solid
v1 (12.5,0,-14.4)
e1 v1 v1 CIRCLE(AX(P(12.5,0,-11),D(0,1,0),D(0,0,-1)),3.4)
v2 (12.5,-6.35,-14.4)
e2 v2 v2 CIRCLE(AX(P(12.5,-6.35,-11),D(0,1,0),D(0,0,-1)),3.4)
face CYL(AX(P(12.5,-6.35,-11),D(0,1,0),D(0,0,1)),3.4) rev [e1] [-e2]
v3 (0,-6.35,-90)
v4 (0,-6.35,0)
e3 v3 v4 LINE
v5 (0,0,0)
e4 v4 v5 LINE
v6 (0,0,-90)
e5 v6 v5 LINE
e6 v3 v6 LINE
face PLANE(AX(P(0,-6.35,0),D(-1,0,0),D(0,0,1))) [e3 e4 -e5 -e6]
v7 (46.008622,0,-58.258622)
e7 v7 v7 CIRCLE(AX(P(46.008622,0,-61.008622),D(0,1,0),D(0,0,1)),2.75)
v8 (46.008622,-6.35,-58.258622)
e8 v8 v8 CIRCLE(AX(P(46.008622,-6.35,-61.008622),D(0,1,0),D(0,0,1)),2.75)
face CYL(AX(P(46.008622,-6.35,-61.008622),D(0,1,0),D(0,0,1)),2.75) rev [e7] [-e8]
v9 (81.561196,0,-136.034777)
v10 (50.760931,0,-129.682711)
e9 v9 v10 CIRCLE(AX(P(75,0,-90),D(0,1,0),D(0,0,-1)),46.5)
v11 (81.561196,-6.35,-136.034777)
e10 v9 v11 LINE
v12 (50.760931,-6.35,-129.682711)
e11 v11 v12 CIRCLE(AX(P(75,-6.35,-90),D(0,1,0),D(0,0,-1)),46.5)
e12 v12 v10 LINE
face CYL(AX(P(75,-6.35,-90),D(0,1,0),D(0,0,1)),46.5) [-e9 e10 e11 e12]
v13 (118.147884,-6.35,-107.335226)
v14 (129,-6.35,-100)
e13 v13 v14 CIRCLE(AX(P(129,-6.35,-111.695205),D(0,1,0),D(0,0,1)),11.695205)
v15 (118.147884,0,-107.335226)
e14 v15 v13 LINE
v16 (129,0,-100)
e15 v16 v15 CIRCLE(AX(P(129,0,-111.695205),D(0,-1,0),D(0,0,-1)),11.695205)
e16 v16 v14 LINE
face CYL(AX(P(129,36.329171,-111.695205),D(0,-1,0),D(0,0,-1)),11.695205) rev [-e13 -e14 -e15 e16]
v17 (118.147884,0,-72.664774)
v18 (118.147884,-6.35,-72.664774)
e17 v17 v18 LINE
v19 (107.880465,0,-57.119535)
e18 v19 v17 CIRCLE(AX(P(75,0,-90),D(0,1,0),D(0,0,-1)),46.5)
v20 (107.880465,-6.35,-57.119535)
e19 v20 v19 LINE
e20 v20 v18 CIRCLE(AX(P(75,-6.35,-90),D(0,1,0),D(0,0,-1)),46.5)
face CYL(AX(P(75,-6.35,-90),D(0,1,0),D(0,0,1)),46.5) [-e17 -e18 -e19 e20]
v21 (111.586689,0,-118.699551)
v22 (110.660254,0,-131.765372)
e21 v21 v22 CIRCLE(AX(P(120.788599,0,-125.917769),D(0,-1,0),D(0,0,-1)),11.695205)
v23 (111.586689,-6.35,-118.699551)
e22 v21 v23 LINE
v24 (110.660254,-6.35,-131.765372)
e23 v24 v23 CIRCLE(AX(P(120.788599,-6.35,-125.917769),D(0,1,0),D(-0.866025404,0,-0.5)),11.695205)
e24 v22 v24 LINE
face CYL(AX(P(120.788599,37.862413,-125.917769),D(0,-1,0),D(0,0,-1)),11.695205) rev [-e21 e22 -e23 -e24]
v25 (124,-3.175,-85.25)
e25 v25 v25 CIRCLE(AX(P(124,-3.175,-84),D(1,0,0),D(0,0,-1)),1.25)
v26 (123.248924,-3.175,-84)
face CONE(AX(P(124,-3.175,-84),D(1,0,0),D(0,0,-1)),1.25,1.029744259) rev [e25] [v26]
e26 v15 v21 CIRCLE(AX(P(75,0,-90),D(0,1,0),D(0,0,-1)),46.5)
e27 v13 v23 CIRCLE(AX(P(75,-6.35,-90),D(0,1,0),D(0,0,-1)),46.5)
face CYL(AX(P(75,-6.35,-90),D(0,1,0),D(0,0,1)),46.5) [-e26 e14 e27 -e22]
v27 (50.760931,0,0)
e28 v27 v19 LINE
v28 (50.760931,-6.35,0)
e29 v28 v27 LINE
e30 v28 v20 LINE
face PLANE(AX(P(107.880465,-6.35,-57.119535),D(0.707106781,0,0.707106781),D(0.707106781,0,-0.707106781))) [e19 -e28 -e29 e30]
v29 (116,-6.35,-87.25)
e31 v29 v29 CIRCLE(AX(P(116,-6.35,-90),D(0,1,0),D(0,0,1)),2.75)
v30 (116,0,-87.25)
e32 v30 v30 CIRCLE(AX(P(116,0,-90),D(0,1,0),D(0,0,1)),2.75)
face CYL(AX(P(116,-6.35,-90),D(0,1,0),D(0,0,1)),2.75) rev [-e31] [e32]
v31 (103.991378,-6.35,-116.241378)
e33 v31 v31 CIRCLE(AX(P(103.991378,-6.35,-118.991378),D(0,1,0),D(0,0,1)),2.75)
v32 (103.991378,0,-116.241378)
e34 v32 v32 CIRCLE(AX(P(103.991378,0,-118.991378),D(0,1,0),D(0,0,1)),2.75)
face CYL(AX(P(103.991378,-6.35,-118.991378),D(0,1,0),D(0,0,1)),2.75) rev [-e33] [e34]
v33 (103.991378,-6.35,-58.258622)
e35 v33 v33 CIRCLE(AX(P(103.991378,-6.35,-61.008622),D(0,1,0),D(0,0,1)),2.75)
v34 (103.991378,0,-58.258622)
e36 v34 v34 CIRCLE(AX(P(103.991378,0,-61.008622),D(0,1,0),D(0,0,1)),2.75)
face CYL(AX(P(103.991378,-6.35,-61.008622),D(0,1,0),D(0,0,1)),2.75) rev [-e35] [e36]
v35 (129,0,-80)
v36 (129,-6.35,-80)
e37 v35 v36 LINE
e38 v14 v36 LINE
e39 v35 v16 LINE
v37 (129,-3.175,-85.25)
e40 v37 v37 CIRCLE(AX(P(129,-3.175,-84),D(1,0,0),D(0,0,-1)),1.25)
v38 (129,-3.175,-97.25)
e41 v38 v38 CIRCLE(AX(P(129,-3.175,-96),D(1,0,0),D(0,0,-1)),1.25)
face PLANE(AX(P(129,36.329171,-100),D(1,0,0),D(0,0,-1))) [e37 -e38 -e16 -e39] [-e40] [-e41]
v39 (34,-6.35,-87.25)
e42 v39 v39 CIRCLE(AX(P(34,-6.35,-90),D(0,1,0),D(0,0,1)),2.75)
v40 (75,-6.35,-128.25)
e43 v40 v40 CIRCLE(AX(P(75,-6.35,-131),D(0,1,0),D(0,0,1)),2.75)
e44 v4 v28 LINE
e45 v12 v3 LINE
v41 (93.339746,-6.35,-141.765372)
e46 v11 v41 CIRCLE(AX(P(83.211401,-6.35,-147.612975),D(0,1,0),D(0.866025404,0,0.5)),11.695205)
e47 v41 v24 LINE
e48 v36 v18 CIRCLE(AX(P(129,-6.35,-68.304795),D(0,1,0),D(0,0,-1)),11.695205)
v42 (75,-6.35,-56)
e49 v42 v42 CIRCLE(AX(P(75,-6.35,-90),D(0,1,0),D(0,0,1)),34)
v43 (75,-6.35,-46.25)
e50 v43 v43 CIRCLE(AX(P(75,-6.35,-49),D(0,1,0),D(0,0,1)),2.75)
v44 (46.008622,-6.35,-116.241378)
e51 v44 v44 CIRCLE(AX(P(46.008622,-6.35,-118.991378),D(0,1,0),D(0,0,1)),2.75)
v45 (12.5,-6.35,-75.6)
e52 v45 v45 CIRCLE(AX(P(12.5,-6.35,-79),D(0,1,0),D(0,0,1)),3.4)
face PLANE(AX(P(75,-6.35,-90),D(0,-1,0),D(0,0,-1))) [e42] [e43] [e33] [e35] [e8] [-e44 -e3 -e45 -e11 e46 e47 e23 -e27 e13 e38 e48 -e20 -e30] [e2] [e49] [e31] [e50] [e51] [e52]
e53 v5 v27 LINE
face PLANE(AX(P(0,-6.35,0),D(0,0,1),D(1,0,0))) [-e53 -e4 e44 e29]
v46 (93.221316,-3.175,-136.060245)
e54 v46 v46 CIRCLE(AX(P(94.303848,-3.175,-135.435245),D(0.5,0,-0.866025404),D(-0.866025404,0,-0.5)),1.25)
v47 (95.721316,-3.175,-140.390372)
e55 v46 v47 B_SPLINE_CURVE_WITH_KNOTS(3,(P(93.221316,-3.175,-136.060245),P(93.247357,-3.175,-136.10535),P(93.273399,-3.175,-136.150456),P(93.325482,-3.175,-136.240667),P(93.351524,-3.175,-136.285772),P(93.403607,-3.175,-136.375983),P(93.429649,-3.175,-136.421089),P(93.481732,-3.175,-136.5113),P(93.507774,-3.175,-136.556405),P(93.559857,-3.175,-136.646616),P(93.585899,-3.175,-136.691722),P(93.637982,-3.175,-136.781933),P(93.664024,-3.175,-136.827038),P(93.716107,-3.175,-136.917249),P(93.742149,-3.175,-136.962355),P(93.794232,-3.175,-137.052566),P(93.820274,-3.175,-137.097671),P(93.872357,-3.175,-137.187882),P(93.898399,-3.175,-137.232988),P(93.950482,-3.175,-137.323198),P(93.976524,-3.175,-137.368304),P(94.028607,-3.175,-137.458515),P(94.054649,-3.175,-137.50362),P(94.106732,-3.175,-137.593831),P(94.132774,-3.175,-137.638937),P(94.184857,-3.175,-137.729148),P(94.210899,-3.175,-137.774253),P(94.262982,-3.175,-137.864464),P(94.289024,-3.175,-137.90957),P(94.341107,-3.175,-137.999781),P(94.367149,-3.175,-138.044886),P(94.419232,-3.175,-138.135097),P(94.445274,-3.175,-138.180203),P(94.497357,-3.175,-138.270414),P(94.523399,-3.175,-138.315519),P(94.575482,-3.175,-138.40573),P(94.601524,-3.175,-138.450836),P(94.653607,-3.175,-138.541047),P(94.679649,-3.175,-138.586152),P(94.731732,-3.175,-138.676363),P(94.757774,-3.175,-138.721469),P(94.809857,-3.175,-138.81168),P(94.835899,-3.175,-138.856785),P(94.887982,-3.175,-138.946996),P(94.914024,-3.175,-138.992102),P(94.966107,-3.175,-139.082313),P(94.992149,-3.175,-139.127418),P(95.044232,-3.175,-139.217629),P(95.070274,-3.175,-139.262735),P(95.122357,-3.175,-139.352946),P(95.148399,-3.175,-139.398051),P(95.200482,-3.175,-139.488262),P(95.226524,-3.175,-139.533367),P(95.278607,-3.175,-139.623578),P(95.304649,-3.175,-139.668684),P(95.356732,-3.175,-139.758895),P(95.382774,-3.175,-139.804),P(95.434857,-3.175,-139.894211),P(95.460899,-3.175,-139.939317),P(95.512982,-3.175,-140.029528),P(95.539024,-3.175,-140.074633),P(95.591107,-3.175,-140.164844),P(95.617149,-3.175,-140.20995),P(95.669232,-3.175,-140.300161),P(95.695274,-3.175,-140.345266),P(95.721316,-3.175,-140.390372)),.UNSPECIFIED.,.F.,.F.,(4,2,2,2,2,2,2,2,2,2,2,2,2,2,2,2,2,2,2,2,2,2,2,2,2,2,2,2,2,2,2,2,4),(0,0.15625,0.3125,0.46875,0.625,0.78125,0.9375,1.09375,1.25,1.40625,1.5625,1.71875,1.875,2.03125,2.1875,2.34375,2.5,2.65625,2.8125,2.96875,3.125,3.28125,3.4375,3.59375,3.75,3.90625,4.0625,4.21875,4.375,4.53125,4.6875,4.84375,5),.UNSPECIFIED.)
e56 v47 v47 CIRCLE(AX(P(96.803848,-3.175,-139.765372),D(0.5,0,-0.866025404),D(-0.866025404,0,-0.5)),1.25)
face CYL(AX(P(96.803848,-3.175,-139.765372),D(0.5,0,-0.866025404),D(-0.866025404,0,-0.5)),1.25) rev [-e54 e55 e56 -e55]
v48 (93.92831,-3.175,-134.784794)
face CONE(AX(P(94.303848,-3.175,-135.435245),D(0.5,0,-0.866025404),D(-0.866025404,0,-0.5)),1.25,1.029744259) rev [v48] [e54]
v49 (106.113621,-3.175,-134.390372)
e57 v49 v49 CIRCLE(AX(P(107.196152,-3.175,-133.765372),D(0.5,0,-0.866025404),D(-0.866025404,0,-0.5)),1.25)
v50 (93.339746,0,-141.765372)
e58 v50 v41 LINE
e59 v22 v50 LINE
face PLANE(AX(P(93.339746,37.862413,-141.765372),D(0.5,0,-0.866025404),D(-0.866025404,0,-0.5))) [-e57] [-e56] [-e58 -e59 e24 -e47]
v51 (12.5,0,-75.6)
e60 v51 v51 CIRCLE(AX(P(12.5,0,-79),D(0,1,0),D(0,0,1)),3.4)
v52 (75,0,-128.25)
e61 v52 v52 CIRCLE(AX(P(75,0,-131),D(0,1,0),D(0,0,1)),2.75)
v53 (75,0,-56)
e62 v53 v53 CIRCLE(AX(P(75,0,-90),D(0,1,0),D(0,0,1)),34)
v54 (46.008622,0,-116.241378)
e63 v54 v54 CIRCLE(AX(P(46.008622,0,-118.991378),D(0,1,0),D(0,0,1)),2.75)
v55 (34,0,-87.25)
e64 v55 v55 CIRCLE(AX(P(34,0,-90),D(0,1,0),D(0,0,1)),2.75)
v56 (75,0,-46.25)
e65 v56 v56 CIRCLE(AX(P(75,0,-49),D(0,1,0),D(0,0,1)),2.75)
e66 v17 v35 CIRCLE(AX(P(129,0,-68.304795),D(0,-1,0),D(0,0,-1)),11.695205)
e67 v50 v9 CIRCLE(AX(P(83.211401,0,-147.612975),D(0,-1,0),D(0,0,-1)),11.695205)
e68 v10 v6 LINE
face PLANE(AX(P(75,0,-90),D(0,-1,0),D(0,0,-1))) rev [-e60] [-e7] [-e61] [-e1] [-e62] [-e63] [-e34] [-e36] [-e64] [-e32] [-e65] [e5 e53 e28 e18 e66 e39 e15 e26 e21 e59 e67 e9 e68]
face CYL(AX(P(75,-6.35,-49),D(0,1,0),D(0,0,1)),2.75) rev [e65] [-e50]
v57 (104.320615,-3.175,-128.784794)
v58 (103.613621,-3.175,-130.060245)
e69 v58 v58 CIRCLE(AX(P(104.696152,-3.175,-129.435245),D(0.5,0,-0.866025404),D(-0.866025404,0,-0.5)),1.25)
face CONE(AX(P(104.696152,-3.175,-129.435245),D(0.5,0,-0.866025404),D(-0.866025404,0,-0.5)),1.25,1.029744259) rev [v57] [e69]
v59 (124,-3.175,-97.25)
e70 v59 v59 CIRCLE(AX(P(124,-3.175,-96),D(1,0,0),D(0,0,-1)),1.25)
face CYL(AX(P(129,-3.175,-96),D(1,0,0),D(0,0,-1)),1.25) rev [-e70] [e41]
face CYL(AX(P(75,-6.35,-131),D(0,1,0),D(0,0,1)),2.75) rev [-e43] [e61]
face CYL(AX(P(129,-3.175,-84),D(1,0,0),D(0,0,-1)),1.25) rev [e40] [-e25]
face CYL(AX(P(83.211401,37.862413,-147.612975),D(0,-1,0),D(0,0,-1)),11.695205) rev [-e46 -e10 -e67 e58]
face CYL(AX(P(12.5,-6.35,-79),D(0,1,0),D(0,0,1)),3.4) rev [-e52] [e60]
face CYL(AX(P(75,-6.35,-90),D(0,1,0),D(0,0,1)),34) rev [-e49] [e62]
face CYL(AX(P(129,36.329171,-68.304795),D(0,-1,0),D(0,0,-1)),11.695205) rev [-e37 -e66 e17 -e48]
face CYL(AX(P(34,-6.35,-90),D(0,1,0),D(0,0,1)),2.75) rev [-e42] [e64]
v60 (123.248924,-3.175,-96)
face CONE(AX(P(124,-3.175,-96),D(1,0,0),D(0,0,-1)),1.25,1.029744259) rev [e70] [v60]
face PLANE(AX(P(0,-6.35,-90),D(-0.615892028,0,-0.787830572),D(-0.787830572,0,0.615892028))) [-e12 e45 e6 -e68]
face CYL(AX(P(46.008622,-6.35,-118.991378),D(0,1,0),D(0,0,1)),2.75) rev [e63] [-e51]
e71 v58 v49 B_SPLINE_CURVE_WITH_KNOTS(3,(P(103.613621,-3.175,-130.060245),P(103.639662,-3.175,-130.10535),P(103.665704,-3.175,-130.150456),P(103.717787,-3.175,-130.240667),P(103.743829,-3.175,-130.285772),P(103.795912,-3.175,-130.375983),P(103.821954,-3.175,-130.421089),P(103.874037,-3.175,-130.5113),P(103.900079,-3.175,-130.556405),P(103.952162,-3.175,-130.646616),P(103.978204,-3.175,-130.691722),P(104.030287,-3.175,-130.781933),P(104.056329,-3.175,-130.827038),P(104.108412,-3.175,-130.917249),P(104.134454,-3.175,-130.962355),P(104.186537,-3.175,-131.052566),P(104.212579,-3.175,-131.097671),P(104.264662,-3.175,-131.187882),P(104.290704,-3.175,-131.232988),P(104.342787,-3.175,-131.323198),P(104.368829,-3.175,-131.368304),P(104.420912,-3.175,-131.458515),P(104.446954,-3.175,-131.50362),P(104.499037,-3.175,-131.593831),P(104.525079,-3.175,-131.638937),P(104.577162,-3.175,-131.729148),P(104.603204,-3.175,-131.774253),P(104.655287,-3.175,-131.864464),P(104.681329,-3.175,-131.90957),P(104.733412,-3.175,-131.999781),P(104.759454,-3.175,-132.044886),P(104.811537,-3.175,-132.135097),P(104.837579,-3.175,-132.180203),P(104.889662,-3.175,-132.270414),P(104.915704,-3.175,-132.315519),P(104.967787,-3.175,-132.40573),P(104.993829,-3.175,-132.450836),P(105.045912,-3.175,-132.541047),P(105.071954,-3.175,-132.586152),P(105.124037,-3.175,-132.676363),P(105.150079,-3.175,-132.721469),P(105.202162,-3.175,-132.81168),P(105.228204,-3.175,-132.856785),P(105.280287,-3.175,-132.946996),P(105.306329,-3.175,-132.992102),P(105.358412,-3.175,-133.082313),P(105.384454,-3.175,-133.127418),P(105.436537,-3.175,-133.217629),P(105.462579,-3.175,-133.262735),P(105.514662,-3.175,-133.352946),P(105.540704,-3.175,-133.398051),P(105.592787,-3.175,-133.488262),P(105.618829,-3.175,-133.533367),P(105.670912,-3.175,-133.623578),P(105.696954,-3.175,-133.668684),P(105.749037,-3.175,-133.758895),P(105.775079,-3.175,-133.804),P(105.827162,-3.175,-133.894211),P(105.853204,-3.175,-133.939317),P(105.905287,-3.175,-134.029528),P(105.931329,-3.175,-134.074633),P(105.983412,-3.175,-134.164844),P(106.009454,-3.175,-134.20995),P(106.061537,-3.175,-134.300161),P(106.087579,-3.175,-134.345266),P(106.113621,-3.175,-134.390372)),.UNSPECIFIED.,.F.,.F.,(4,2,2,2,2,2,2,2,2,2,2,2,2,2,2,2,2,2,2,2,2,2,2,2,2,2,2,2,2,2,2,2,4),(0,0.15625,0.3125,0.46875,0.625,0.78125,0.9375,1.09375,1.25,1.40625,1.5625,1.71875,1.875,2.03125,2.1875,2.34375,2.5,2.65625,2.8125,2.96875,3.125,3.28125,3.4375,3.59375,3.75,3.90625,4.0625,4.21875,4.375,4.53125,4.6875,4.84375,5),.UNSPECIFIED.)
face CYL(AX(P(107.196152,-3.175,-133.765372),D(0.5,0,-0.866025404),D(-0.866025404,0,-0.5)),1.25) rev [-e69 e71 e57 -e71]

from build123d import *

# Parameters (mm, degrees)
BASE_FLANGE1_DEPTH = 6.35
SKETCH8_R          = 3.4
CUT_EXTRUDE1_DEPTH = 183.851914127
SKETCH9_R          = 34
CUT_EXTRUDE2_DEPTH = 183.851914127
SKETCH10_R         = 2.75
CUT_EXTRUDE3_DEPTH = 183.851914127
TABS_1_START       = -6.35
TABS_1_DEPTH       = 6.35
TABS_2_AT_2_COUNT  = 2
TABS_2_AT_2_PITCH  = 12
CIRPATTERN2_COUNT  = 2
CIRPATTERN2_ANGLE  = 60


# Sheet-metal steps are written as plain solids
with BuildPart() as part:
    # Sketch2 → Base-Flange1 (new body)
    with BuildSketch(Plane(origin=(0, 0, 0), x_dir=(1, 0, 0), z_dir=(0, 1, 0))):
        with BuildLine():
            Line((0, 0), (50.76093065, 0))
            Line((50.76093065, 0), (107.880465325, 57.119534675))
            ThreePointArc((107.880465325, 57.119534675), (111.537953618, 118.761570635), (50.76093065, 129.682710556))
            Line((50.76093065, 129.682710556), (0, 90))
            Line((0, 90), (0, 0))
        make_face()
    extrude(amount=-BASE_FLANGE1_DEPTH)

    # Sketch8 → Cut-Extrude1 (cut, through all)
    with BuildSketch(Plane(origin=(0, 0, 0), x_dir=(1, 0, 0), z_dir=(0, 1, 0))):
        with Locations(Location((12.5, 79, 0), (0, 0, 270))):
            Circle(SKETCH8_R)
        with Locations(Location((12.5, 11, 0), (0, 0, 90))):
            Circle(SKETCH8_R)
    extrude(amount=-CUT_EXTRUDE1_DEPTH, mode=Mode.SUBTRACT)

    # Sketch9 → Cut-Extrude2 (cut, through all)
    with BuildSketch(Plane(origin=(0, 0, 0), x_dir=(1, 0, 0), z_dir=(0, 1, 0))):
        with Locations(Location((75, 90, 0), (0, 0, 270))):
            Circle(SKETCH9_R)
    extrude(amount=-CUT_EXTRUDE2_DEPTH, mode=Mode.SUBTRACT)

    # Sketch10 → Cut-Extrude3 (cut, through all)
    with BuildSketch(Plane(origin=(0, 0, 0), x_dir=(1, 0, 0), z_dir=(0, 1, 0))):
        with Locations(Location((75, 131, 0), (0, 0, 270))):
            Circle(SKETCH10_R)
        with Locations(Location((103.991378029, 118.991378029, 0), (0, 0, 270))):
            Circle(SKETCH10_R)
        with Locations(Location((116, 90, 0), (0, 0, 270))):
            Circle(SKETCH10_R)
        with Locations(Location((103.991378029, 61.008621971, 0), (0, 0, 270))):
            Circle(SKETCH10_R)
        with Locations(Location((75, 49, 0), (0, 0, 270))):
            Circle(SKETCH10_R)
        with Locations(Location((46.008621971, 61.008621971, 0), (0, 0, 270))):
            Circle(SKETCH10_R)
        with Locations(Location((34, 90, 0), (0, 0, 270))):
            Circle(SKETCH10_R)
        with Locations(Location((46.008621971, 118.991378029, 0), (0, 0, 270))):
            Circle(SKETCH10_R)
    extrude(amount=-CUT_EXTRUDE3_DEPTH, mode=Mode.SUBTRACT)

    # Sketch11 → Tabs_1 (add)
    with BuildSketch(Plane.XZ.offset(6.35).offset(TABS_1_START)):
        with BuildLine():
            Line((129, -100), (129, -80))
            ThreePointArc((129, -80), (122.450687881, -77.994187792), (118.147884423, -72.66477373))
            ThreePointArc((118.147884423, -72.66477373), (121.5, -90), (118.147884423, -107.33522627))
            ThreePointArc((118.147884423, -107.33522627), (122.450687881, -102.005812208), (129, -100))
        make_face()
    tabs_1 = extrude(amount=TABS_1_DEPTH)

    # Sketch20 → Tabs_2 (revolve, cut)
    with BuildSketch(Plane(origin=(129, -3.175, -84), x_dir=(0, 0, -1), z_dir=(0, 1, 0))):
        Polygon((0, 0), (0, 5.751075774), (1.25, 5), (1.25, 0), align=None)
    tabs_2 = revolve(axis=Axis((135.35, -3.175, -84), (-1, 0, 0)), mode=Mode.SUBTRACT)

    # Tabs_2 at 2: Tabs_2 ×2
    with Locations(*[(0, 0, -i * TABS_2_AT_2_PITCH) for i in range(1, TABS_2_AT_2_COUNT)]):
        add(tabs_2, mode=Mode.SUBTRACT)

    # CirPattern2: Tabs_1, Tabs_2 ×2 about axis
    cirpattern2_axis = Axis((75, 0, -90), (0, 1, 0))
    add([tabs_1.rotate(cirpattern2_axis, i * CIRPATTERN2_ANGLE / (CIRPATTERN2_COUNT - 1)) for i in range(1, CIRPATTERN2_COUNT)])
    add([tabs_2.rotate(cirpattern2_axis, i * CIRPATTERN2_ANGLE / (CIRPATTERN2_COUNT - 1)) for i in range(1, CIRPATTERN2_COUNT)], mode=Mode.SUBTRACT)

    # CirPattern2 copy 1 sketch → CirPattern2 copy 1 (revolve, cut)
    with BuildSketch(Plane(origin=(96.803847577, -3.175, -139.765371804), x_dir=(-0.8660254037844399, 0, -0.4999999999999978), z_dir=(0, 1, 0))):
        Polygon((0, 0), (0, 5.751075774), (1.25, 5), (1.25, 0), align=None)
    revolve(axis=Axis((99.978847577, -3.175, -145.264633118), (-0.4999999999999978, 0, 0.8660254037844399)), mode=Mode.SUBTRACT)


solid = part.part
